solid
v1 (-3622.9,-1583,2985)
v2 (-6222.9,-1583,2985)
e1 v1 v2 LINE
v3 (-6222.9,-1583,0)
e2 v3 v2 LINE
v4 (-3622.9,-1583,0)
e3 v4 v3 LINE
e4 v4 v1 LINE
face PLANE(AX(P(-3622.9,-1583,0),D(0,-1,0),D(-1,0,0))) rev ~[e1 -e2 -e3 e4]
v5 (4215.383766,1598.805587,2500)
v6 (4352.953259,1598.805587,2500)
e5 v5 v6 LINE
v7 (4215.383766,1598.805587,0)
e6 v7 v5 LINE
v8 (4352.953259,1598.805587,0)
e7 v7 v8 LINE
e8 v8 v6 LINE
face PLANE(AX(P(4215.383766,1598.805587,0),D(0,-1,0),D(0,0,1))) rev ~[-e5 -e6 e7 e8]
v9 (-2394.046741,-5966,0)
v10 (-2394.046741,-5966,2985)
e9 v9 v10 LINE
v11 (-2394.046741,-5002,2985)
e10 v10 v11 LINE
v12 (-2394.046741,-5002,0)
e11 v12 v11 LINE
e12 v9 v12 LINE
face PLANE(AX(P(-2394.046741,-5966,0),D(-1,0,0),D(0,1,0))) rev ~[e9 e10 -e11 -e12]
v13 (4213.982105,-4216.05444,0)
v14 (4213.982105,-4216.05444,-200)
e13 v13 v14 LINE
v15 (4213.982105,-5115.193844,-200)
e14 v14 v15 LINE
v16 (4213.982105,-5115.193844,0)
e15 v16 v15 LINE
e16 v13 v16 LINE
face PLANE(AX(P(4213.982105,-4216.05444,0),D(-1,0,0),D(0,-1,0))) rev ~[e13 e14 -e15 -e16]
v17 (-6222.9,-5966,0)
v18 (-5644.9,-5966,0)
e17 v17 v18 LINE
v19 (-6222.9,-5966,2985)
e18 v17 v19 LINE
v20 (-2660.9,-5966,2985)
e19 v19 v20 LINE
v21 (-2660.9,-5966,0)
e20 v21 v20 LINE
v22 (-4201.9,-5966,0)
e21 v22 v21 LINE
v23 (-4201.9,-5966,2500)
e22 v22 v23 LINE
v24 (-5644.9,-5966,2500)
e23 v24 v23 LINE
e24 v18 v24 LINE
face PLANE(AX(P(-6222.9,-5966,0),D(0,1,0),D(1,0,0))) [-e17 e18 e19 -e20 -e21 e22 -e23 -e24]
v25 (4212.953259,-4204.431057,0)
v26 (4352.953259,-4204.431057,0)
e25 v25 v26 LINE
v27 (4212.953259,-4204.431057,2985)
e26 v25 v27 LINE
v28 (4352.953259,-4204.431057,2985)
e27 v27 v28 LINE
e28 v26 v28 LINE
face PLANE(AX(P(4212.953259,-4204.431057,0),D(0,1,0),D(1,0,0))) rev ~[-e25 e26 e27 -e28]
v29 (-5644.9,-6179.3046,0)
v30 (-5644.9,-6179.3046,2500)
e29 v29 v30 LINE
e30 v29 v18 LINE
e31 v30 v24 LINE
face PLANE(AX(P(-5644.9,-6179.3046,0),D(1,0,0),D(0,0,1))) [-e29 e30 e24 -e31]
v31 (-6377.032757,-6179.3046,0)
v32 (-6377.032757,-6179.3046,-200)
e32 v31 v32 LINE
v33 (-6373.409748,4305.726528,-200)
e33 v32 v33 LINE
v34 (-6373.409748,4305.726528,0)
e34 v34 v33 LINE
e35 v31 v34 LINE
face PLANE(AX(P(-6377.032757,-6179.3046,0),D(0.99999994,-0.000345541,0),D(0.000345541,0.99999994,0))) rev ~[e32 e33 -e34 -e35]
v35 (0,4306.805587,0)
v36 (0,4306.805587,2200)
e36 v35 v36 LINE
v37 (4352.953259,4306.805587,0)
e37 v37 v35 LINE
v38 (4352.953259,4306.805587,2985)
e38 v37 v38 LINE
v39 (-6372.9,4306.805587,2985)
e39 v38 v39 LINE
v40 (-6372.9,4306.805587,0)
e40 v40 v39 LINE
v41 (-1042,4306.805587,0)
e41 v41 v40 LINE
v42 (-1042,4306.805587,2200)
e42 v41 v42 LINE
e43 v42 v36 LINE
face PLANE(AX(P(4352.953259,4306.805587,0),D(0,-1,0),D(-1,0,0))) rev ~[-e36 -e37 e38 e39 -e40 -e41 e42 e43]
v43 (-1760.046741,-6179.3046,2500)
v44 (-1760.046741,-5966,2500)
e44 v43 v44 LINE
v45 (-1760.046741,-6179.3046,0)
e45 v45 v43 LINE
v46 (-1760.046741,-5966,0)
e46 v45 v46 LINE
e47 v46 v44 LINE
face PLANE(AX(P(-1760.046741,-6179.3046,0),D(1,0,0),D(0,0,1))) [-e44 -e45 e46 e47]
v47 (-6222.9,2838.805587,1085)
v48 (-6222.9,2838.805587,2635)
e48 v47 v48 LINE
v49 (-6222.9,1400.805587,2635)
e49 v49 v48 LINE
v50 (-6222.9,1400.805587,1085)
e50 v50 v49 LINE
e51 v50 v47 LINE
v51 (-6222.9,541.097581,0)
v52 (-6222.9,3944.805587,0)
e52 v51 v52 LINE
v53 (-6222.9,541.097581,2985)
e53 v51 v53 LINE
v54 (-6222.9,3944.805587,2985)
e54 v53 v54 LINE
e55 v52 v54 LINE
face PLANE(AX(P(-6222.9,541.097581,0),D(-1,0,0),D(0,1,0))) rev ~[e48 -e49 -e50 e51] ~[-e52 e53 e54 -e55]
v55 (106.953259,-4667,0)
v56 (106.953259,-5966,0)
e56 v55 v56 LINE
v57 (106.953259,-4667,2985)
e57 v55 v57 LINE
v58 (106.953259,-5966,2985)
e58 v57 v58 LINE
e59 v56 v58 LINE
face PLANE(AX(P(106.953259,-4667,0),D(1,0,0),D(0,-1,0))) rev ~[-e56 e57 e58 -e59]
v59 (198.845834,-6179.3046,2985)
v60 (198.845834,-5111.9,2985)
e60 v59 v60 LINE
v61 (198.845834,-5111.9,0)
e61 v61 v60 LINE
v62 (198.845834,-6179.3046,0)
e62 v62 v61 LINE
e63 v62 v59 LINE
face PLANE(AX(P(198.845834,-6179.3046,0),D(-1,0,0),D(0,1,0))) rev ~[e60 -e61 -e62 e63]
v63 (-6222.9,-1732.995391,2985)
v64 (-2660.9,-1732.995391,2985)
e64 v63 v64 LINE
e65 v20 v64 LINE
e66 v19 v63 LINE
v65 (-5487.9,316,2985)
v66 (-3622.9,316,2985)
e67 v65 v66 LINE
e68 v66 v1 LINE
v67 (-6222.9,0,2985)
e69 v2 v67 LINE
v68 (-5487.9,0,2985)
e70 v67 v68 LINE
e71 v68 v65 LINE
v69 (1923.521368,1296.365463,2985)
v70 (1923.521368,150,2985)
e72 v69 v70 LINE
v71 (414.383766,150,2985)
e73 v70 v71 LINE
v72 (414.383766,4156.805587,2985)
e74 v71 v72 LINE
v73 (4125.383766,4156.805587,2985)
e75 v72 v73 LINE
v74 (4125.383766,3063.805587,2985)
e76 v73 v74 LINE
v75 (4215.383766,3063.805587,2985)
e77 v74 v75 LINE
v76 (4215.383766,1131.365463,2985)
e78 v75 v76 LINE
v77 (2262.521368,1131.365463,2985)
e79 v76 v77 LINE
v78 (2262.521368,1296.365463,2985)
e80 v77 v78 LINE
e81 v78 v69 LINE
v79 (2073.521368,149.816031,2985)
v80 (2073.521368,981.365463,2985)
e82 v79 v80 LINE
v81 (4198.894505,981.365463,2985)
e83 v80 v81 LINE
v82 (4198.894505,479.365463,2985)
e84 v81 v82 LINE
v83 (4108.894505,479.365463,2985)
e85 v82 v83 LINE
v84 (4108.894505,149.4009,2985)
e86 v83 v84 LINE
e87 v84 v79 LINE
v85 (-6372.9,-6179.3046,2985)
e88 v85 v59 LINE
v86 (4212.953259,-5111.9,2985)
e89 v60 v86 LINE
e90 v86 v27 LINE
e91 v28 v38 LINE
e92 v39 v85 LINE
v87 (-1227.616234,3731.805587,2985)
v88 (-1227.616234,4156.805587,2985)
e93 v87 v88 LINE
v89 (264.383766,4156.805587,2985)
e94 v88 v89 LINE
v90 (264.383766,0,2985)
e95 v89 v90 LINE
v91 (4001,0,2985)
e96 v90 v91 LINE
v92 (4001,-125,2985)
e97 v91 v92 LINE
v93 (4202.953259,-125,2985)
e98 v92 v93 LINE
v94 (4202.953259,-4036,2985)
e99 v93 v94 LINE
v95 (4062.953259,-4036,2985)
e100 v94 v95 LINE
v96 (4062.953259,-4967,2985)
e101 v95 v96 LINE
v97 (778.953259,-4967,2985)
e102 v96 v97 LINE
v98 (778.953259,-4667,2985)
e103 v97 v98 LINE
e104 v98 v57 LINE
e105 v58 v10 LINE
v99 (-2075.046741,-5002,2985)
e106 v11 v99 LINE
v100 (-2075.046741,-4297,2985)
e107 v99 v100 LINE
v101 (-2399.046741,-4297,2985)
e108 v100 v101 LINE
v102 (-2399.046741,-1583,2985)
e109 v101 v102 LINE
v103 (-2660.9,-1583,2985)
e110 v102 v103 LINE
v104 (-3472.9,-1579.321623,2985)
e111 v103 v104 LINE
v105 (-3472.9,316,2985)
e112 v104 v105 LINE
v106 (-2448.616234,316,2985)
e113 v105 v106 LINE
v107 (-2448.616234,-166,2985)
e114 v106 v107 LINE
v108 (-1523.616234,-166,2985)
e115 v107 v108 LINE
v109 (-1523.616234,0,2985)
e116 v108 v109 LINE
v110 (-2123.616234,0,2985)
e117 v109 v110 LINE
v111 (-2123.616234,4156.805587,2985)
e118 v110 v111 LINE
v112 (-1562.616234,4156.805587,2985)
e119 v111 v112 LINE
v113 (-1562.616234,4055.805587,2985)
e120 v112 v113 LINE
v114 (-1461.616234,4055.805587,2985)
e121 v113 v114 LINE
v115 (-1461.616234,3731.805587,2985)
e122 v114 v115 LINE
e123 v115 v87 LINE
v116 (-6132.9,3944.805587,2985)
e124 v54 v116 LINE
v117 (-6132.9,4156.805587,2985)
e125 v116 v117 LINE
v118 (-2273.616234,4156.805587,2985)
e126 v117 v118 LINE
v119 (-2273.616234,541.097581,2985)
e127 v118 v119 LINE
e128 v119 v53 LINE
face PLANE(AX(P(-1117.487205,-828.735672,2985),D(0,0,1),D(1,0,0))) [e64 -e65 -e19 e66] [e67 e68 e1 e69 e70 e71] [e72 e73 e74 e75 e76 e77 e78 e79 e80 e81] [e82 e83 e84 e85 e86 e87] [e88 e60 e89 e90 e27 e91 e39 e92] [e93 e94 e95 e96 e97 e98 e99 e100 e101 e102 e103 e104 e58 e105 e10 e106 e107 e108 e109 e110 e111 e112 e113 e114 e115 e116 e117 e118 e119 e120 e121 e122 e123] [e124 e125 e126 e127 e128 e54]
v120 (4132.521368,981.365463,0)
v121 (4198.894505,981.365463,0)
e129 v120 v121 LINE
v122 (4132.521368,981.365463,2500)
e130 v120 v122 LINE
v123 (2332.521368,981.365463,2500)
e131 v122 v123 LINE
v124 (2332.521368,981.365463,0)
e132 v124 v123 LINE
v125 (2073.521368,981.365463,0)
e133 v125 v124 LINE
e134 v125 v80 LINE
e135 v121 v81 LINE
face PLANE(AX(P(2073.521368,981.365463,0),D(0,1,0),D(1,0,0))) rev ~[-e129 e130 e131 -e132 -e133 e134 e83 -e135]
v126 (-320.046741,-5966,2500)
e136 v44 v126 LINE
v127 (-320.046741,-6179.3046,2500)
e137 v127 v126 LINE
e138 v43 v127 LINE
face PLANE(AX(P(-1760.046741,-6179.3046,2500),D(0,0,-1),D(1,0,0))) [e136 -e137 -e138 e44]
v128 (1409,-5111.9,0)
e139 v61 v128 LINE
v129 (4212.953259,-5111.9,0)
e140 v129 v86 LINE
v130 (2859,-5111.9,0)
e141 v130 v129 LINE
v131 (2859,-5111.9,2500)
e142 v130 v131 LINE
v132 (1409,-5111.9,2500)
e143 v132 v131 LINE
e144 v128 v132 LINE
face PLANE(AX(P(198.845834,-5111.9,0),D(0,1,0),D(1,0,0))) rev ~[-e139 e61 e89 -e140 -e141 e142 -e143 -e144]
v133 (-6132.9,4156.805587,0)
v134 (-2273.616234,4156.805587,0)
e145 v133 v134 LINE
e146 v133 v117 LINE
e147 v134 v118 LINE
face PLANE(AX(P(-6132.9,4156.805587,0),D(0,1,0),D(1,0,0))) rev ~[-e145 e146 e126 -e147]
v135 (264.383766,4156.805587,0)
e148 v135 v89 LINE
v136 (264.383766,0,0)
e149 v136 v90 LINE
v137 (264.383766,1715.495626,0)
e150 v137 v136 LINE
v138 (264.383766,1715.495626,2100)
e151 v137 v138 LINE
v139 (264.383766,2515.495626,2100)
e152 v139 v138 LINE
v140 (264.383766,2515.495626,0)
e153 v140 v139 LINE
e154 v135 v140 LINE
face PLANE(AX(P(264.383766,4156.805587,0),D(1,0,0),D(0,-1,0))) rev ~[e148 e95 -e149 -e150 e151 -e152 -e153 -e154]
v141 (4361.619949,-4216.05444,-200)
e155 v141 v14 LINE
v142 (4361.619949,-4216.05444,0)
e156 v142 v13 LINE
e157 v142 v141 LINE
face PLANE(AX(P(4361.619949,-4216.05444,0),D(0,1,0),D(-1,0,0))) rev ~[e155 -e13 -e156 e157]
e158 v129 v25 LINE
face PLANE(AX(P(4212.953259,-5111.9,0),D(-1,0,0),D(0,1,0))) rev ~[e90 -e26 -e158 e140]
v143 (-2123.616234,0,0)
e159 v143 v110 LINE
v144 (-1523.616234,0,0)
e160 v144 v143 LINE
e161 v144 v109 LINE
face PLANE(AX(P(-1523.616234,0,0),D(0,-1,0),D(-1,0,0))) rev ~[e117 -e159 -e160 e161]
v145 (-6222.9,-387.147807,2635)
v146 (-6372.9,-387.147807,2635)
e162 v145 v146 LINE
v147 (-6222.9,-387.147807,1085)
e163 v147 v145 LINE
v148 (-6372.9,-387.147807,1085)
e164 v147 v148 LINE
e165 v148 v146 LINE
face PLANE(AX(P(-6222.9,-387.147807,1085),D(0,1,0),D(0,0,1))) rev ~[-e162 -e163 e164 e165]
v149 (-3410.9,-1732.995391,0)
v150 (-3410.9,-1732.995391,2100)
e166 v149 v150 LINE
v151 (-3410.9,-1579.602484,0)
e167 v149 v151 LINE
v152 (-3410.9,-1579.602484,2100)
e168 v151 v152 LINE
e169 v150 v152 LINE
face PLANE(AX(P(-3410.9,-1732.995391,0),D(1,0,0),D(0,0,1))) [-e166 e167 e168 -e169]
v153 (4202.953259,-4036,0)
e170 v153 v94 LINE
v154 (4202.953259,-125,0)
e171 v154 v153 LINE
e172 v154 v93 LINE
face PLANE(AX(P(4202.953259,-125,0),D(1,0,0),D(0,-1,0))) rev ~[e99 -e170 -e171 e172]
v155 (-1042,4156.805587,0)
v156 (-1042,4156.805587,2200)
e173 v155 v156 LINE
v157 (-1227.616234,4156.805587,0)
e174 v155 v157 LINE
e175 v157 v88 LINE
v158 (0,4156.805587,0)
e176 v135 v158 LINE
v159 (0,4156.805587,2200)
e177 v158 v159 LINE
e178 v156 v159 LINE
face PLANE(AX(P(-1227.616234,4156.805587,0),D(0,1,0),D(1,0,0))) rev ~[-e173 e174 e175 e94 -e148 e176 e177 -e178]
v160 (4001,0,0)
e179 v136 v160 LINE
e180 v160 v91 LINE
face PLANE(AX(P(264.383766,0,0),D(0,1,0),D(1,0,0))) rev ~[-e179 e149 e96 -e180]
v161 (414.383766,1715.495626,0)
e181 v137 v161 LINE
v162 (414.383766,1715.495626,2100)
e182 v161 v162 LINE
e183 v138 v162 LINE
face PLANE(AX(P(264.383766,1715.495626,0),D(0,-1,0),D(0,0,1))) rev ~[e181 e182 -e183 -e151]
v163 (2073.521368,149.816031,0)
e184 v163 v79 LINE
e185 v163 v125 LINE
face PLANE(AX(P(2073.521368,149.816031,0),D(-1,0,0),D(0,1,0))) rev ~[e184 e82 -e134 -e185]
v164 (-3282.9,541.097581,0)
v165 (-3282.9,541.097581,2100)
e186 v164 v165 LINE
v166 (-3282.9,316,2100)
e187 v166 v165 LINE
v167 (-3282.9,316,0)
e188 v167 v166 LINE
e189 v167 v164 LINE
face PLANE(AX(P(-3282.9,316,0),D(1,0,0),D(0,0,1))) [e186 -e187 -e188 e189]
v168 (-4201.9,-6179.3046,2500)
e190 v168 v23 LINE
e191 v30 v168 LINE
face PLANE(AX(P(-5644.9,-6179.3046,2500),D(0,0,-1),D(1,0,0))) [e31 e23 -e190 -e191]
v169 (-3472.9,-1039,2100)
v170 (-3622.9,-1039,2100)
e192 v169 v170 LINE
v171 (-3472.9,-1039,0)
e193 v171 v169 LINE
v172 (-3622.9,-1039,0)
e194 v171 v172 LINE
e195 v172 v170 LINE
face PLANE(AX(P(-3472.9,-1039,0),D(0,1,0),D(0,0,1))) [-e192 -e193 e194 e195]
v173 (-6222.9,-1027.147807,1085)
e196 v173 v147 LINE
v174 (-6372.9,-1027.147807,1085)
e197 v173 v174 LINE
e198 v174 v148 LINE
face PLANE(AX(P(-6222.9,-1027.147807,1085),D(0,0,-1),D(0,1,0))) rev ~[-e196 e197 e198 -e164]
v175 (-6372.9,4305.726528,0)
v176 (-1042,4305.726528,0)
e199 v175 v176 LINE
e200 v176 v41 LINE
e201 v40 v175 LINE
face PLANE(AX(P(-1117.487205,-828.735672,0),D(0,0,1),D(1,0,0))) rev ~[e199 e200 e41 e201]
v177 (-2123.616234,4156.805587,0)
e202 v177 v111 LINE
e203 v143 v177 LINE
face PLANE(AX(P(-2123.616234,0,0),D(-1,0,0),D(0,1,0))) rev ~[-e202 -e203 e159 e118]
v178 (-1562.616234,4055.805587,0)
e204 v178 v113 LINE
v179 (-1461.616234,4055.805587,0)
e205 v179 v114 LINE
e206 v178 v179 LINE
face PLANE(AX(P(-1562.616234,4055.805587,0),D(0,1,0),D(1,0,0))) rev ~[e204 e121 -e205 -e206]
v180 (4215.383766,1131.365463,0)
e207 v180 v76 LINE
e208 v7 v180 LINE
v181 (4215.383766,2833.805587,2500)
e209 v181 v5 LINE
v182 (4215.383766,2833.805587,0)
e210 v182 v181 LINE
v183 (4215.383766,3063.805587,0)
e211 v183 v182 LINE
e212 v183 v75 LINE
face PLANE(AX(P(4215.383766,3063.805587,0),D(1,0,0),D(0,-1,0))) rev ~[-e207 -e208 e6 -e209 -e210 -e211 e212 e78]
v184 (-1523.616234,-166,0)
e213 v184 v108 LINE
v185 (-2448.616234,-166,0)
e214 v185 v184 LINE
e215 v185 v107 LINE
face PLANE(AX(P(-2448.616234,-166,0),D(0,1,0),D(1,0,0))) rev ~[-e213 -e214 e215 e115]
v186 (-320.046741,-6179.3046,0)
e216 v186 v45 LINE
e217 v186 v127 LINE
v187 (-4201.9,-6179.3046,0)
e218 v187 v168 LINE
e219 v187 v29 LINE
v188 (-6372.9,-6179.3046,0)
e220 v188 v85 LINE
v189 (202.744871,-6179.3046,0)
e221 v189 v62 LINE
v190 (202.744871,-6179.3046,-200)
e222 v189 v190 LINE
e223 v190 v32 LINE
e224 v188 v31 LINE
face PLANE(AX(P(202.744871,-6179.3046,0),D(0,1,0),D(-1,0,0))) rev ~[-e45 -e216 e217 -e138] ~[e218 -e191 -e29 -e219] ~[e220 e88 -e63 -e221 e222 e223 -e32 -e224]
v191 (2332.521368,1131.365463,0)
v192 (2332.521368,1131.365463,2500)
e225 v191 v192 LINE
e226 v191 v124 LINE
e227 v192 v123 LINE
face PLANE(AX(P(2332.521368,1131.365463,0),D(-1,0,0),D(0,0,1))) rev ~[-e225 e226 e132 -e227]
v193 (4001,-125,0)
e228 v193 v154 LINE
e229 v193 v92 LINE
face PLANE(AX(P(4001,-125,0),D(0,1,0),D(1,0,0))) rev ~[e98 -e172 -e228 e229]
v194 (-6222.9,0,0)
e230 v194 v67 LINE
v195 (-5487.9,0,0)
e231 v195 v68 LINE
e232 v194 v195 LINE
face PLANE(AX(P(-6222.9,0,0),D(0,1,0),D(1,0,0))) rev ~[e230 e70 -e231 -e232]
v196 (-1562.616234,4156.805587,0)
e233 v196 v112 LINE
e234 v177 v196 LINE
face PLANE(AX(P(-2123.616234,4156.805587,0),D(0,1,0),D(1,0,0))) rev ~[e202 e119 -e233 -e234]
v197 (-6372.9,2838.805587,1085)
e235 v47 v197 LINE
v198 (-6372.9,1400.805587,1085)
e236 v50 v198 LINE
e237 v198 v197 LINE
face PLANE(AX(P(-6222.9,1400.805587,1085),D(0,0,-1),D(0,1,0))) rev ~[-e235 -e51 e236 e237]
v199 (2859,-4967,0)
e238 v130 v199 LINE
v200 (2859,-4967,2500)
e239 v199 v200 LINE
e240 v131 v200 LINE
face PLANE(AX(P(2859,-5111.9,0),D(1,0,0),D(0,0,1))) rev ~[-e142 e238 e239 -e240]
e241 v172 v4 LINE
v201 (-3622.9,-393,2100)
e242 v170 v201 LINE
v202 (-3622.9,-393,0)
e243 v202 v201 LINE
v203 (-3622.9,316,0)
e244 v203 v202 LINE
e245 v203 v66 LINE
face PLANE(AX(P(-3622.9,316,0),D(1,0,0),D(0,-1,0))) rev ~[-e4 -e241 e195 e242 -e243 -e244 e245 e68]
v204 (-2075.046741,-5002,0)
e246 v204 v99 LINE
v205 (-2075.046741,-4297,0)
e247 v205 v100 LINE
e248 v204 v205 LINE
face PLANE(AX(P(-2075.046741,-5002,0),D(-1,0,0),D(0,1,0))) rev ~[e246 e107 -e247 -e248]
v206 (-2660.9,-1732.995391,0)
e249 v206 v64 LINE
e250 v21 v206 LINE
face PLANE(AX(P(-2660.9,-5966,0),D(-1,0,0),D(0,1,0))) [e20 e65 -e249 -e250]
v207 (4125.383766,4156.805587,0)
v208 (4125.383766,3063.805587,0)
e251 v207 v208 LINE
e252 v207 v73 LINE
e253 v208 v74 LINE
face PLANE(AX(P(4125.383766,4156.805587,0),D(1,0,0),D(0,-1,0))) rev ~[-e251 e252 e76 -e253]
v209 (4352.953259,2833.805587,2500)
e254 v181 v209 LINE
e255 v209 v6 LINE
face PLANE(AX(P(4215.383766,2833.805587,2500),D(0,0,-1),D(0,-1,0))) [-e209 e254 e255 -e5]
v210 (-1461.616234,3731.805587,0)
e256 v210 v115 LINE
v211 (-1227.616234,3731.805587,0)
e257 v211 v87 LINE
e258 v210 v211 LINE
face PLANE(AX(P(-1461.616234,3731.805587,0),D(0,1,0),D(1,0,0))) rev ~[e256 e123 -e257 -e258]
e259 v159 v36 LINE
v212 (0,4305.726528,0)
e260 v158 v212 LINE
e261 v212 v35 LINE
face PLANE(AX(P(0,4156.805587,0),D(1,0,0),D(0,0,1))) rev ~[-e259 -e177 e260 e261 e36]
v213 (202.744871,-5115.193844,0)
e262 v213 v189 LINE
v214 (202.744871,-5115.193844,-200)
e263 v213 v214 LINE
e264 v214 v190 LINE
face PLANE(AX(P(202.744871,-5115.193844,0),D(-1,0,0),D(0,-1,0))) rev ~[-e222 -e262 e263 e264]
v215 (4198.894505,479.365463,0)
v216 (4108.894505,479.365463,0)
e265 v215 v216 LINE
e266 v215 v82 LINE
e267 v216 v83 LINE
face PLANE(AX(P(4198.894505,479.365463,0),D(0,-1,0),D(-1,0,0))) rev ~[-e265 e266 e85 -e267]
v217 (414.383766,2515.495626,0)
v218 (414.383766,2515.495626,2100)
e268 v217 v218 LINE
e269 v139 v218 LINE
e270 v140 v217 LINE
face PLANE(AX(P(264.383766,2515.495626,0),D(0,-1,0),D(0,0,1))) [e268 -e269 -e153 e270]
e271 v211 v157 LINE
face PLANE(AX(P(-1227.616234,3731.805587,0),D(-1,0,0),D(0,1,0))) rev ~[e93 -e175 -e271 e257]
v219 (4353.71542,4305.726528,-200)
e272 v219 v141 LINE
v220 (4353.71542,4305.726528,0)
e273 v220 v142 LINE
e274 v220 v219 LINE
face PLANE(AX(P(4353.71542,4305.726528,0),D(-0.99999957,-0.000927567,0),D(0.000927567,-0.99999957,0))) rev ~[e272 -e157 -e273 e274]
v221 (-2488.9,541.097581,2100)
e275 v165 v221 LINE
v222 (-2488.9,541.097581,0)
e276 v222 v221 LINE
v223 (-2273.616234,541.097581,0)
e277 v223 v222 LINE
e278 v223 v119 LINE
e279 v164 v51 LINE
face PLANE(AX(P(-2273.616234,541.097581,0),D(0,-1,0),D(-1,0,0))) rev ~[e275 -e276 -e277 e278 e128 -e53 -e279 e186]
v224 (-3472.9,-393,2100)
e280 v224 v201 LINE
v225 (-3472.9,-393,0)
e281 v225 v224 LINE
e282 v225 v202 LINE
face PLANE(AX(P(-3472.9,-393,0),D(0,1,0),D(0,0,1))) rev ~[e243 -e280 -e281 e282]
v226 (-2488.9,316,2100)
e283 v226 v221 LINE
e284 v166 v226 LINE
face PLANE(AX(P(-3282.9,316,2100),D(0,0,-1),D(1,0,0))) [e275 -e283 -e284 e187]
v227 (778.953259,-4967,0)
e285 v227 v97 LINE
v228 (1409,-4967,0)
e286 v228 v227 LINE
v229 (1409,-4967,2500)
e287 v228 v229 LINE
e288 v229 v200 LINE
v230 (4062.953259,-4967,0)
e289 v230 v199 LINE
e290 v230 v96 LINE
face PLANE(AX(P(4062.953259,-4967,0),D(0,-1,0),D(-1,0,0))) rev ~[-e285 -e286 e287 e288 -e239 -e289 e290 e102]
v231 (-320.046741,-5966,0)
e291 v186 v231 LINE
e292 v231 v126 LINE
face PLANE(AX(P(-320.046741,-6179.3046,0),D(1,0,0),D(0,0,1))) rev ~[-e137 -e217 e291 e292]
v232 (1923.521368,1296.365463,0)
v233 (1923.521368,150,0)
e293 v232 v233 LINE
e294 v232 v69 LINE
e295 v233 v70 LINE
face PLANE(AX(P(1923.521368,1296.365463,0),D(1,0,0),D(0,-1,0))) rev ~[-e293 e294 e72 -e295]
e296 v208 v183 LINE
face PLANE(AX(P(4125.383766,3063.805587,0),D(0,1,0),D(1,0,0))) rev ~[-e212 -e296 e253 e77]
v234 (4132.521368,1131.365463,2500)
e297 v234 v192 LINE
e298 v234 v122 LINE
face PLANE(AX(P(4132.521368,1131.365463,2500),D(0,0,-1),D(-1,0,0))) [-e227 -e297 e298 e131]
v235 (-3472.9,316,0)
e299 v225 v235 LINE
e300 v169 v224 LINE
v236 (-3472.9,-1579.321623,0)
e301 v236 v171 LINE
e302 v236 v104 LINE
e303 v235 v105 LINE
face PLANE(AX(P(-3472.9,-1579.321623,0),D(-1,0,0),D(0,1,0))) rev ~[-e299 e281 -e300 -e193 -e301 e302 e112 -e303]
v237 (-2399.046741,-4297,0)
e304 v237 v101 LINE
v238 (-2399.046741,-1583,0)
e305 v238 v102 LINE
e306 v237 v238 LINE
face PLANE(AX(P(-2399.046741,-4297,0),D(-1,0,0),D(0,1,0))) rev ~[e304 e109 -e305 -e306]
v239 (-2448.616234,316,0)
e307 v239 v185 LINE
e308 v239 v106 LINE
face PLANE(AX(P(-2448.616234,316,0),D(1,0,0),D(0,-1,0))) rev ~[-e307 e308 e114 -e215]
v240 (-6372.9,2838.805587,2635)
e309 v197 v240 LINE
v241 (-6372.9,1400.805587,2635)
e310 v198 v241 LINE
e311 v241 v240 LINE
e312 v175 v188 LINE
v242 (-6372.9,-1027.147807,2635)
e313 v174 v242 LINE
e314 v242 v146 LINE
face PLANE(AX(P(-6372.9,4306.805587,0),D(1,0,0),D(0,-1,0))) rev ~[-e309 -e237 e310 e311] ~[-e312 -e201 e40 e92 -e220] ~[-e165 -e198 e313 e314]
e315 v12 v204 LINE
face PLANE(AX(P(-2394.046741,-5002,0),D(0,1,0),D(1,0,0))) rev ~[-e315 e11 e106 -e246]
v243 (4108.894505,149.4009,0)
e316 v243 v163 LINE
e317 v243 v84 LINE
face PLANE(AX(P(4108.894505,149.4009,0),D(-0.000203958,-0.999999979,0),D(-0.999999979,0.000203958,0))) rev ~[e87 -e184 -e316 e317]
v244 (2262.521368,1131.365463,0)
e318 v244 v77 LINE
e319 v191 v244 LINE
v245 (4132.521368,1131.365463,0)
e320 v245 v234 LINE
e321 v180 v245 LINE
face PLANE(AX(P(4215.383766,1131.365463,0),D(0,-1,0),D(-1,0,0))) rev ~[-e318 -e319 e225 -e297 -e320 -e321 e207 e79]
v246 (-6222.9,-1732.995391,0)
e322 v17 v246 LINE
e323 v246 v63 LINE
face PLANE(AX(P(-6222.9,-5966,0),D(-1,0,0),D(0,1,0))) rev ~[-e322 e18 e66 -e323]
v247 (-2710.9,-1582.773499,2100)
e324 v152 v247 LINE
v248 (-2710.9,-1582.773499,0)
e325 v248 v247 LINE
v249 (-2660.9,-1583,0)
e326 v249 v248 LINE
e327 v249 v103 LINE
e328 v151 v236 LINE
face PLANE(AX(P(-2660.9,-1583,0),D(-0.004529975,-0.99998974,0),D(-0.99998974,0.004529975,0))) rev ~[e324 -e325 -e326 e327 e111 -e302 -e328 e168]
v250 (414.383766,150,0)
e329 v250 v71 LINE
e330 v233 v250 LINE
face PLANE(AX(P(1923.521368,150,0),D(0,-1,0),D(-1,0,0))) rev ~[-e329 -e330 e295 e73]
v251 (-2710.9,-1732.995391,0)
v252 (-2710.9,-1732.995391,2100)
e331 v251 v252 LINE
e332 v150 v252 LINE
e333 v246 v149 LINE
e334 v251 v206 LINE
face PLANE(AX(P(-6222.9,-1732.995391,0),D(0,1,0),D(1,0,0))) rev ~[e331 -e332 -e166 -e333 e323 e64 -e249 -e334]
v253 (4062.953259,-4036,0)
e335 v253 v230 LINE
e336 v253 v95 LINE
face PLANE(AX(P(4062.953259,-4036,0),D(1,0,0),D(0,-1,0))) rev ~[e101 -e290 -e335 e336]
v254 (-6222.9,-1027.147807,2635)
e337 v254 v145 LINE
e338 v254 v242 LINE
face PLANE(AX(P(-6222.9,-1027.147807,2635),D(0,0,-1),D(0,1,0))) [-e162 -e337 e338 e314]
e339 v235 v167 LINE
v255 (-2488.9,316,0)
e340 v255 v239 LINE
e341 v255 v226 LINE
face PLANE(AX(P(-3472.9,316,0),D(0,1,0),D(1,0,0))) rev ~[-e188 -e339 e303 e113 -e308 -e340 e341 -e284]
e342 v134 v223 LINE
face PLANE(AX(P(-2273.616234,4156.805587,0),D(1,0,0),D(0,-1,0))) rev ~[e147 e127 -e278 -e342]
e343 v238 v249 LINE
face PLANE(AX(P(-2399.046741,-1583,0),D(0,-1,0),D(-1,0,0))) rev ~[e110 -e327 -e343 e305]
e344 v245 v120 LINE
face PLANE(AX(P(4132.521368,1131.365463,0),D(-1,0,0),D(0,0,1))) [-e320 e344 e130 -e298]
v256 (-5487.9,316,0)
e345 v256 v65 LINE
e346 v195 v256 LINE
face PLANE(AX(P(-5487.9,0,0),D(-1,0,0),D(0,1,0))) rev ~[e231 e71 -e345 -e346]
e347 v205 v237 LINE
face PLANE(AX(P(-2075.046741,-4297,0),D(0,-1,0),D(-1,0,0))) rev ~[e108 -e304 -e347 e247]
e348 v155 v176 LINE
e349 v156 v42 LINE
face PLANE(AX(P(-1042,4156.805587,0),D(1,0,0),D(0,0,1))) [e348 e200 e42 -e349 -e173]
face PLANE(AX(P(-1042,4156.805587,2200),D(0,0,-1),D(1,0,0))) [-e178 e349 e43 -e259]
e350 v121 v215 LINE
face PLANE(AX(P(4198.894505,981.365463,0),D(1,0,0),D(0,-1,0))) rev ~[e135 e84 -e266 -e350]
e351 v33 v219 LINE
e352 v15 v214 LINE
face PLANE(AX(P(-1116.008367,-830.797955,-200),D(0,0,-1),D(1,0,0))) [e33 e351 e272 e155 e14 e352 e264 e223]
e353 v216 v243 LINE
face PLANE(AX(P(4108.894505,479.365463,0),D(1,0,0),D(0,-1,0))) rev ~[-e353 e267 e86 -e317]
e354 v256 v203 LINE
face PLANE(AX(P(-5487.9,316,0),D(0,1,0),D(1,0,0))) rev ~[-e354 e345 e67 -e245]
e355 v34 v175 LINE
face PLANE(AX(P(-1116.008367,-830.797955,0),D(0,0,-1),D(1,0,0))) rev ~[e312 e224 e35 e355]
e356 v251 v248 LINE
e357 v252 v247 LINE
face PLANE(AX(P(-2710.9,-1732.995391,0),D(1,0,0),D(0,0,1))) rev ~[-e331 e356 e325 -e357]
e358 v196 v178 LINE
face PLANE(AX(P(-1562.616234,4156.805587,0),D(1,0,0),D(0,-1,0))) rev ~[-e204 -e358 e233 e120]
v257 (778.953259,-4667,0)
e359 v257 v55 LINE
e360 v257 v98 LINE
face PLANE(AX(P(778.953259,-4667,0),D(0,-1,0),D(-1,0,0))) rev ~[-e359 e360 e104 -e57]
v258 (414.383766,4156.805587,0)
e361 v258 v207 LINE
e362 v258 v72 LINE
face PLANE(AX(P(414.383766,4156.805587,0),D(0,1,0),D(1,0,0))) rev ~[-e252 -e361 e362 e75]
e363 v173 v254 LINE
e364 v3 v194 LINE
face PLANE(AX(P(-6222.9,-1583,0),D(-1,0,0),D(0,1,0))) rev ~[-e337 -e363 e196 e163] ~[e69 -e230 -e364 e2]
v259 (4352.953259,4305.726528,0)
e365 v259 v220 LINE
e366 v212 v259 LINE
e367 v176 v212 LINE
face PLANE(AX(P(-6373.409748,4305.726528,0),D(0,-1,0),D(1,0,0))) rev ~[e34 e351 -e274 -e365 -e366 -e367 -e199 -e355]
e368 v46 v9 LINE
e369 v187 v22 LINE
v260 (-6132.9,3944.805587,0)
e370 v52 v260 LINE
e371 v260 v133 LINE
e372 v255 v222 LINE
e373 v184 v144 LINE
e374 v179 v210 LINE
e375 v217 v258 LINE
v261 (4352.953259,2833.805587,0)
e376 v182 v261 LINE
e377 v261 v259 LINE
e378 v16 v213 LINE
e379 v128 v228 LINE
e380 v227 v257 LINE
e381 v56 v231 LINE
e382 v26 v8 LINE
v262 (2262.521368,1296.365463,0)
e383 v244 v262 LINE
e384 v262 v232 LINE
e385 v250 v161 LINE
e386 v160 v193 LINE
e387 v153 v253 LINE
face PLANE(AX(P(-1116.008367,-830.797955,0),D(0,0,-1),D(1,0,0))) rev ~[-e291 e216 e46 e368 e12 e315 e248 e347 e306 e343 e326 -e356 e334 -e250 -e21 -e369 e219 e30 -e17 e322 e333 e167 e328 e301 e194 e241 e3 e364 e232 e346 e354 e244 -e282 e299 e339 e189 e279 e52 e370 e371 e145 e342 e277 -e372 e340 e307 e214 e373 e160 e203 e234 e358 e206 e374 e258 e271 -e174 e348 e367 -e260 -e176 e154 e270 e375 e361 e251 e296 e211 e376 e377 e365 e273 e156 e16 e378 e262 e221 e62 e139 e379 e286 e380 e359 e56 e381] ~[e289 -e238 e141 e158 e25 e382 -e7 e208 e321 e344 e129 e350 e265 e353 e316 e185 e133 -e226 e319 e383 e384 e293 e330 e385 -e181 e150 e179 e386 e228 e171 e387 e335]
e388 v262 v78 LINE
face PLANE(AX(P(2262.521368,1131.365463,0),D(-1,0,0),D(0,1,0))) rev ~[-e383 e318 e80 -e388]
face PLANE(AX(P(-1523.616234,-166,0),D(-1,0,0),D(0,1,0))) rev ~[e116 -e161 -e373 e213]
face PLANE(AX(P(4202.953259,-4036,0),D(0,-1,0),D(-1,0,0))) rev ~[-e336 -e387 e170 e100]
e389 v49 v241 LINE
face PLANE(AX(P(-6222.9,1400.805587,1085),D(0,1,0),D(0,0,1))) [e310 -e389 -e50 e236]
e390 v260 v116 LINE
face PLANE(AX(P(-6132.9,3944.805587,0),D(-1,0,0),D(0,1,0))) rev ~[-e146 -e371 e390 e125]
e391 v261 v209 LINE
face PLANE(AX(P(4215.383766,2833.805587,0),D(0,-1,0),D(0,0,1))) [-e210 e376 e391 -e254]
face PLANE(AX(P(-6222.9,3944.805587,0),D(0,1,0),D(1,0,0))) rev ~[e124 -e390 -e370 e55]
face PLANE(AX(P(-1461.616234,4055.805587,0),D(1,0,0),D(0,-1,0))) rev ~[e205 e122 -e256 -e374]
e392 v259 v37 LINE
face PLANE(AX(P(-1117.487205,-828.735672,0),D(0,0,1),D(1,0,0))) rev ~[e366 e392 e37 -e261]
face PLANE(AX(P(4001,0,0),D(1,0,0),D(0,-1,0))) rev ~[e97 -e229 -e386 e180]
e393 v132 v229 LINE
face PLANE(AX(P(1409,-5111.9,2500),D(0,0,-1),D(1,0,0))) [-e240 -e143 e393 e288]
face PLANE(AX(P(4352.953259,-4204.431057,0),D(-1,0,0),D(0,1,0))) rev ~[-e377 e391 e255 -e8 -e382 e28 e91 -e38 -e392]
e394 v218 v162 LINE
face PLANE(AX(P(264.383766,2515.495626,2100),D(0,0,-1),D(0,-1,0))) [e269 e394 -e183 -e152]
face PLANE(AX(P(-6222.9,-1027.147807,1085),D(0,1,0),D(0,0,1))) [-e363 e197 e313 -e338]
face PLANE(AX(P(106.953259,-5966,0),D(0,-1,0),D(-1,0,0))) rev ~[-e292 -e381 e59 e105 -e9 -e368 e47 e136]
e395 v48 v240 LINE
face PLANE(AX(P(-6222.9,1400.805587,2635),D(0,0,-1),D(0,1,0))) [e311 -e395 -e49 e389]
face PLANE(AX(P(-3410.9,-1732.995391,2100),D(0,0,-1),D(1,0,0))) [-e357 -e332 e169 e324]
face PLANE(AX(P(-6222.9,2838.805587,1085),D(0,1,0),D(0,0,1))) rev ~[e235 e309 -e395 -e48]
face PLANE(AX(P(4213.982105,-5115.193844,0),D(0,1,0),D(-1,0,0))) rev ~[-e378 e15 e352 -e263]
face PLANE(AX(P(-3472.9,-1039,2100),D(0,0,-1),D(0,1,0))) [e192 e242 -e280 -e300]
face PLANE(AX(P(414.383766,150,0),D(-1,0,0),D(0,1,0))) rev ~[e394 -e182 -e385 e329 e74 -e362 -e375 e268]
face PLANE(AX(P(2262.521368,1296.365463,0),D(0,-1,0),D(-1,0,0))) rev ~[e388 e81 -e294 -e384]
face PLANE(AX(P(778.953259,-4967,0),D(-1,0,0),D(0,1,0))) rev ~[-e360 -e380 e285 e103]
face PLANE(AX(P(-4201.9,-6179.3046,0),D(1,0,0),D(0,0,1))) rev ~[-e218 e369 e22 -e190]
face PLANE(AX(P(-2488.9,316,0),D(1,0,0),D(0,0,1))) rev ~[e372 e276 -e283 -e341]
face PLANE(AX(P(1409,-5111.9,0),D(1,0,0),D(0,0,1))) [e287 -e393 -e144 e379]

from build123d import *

# Parameters (mm, degrees)
F0_W      = 3562
F0_H      = 4233.004609108
F1_DEPTH  = 2985
F2_W      = 1450
F2_H      = 2500
F3_DEPTH  = 144.9
F4_W      = 1440
F4_H      = 2500
F5_DEPTH  = 213.304599762
F6_W      = 1443
F6_H      = 2500
F7_DEPTH  = 213.304599762
F8_W      = 797
F8_H      = 2500
F9_DEPTH  = 4156.8055872194
F10_W     = 800
F10_H     = 2100
F11_DEPTH = 150
F12_W     = 1042
F12_H     = 2200
F13_DEPTH = 150
F14_W     = 1235
F14_H     = 2500
F15_DEPTH = 137.5694923401
F16_W     = 700
F16_H     = 2100
F17_DEPTH = 153.3939067339
F18_W     = 794
F18_H     = 2100
F19_DEPTH = 225.0975813866
F20_W     = 646
F20_H     = 2100
F21_DEPTH = 150
F22_W     = 640
F22_H     = 1550
F23_DEPTH = 150
F24_W     = 1438
F24_H     = 1550
F25_DEPTH = 150
F27_DEPTH = 200
F28_W     = 1800
F28_H     = 2500
F29_DEPTH = 150


with BuildPart() as f1:
    # F0 (on Top) → F1 (new body)
    with BuildSketch(Plane.XY):
        Polygon((1409, -5111.9), (2800.470790863, -5111.9), (4212.9532585144, -5111.9), (4212.9532585144, -4204.4310569763), (4352.9532585144, -4204.4310569763), (4352.9532585144, 4306.8055872194), (-2273.6162338257, 4306.8055872194), (-6372.8999999957, 4306.8055872194), (-6372.8999999957, 541.0975813866), (-6372.8999999957, -6179.304599762), (-2660.8999999957, -6179.304599762), (-1872.0002385101, -6179.304599762), (-435.1912385101, -6179.304599762), (198.84583354, -6179.304599762), (198.84583354, -5111.9), (720.84583354, -5111.9), (1350.470790863, -5111.9), align=None)
        with Locations((-4441.8999999957, -3849.497695446)):
            Rectangle(F0_W, F0_H, mode=Mode.SUBTRACT)
        Polygon((-5487.8999999957, 316), (-3622.8999999957, 316), (-3622.8999999957, -1583), (-6222.8999999957, -1583), (-6222.8999999957, 0), (-5487.8999999957, 0), align=None, mode=Mode.SUBTRACT)
        Polygon((-6132.8999999957, 4156.8055872194), (-2273.6162338257, 4156.8055872194), (-2273.6162338257, 541.0975813866), (-3622.8999999957, 541.0975813866), (-6222.8999999957, 541.0975813866), (-6222.8999999957, 3944.8055872194), (-6132.8999999957, 3944.8055872194), align=None, mode=Mode.SUBTRACT)
        Polygon((264.3837661743, 4156.8055872194), (264.3837661743, 0), (4001, 0), (4001, -125), (4202.9532585144, -125), (4202.9532585144, -4036), (4062.9532585144, -4036), (4062.9532585144, -4501.5), (4062.9532585144, -4967), (2970.9532585144, -4967), (1520.9532585144, -4967), (778.9532585144, -4967), (778.9532585144, -4667), (106.9532585144, -4667), (106.9532585144, -5966), (-320.0467414856, -5966), (-1760.0467414856, -5966), (-2394.0467414856, -5966), (-2394.0467414856, -5002), (-2075.0467414856, -5002), (-2075.0467414856, -4297), (-2399.0467414856, -4297), (-2399.0467414856, -1583), (-2660.8999999957, -1583), (-3472.8999999957, -1579.3216228485), (-3472.8999999957, 316), (-2448.6162338257, 316), (-2448.6162338257, -166), (-2123.6162338257, -166), (-1523.6162338257, -166), (-1523.6162338257, 0), (-2123.6162338257, 0), (-2123.6162338257, 150), (-2123.6162338257, 4156.8055872194), (-1562.6162338257, 4156.8055872194), (-1562.6162338257, 4055.8055872194), (-1461.6162338257, 4055.8055872194), (-1461.6162338257, 3731.8055872194), (-1227.6162338257, 3731.8055872194), (-1227.6162338257, 4156.8055872194), align=None, mode=Mode.SUBTRACT)
        Polygon((4198.8945047255, 981.3654631398), (4198.8945047255, 479.3654631398), (4108.8945047255, 479.3654631398), (4108.8945047255, 149.4008999277), (2259.8945047255, 149.7780185152), (2073.5213682051, 149.8160308321), (2073.5213682051, 981.3654631398), align=None, mode=Mode.SUBTRACT)
        Polygon((4215.3837661743, 1131.3654631398), (2262.5213682051, 1131.3654631398), (2262.5213682051, 1296.3654631398), (1923.5213682051, 1296.3654631398), (1923.5213682051, 150), (414.3837661743, 150), (414.3837661743, 1131.3654631398), (414.3837661743, 4156.8055872194), (4125.3837661743, 4156.8055872194), (4125.3837661743, 3063.8055872194), (4215.3837661743, 3063.8055872194), align=None, mode=Mode.SUBTRACT)
    extrude(amount=F1_DEPTH)

    # F2 (on face) → F3 (cut, through all)
    with BuildSketch(Plane.XZ.offset(5111.9)):
        with Locations((2134, 1250)):
            Rectangle(F2_W, F2_H)
    extrude(amount=-F3_DEPTH, mode=Mode.SUBTRACT)

    # F4 (on face) → F5 (cut, through all)
    with BuildSketch(Plane.XZ.offset(6179.304599762)):
        with Locations((-1040.0467414856, 1250)):
            Rectangle(F4_W, F4_H)
    extrude(amount=-F5_DEPTH, mode=Mode.SUBTRACT)

    # F6 (on face) → F7 (cut, through all)
    with BuildSketch(Plane.XZ.offset(6179.304599762)):
        with Locations((-4923.3999999957, 1250)):
            Rectangle(F6_W, F6_H)
    extrude(amount=-F7_DEPTH, mode=Mode.SUBTRACT)

    # F8 (on face) → F9 (cut, through all)
    with BuildSketch(Plane.XZ):
        with Locations((-398.5, 1250)):
            Rectangle(F8_W, F8_H)
    extrude(amount=-F9_DEPTH, mode=Mode.SUBTRACT)

    # F10 (on face) → F11 (cut, through all)
    with BuildSketch(Plane(origin=(264.3837661743, 0, 0), x_dir=(0, -1, 0), z_dir=(-1, 0, 0))):
        with Locations((-2115.4956257177, 1050)):
            Rectangle(F10_W, F10_H)
    extrude(amount=-F11_DEPTH, mode=Mode.SUBTRACT)

    # F12 (on face) → F13 (cut, through all)
    with BuildSketch(Plane.XZ.offset(-4156.8055872194)):
        with Locations((-521, 1100)):
            Rectangle(F12_W, F12_H)
    extrude(amount=-F13_DEPTH, mode=Mode.SUBTRACT)

    # F14 (on face) → F15 (cut, through all)
    with BuildSketch(Plane(origin=(4215.3837661743, 0, 0), x_dir=(0, -1, 0), z_dir=(-1, 0, 0))):
        with Locations((-2216.3055872194, 1250)):
            Rectangle(F14_W, F14_H)
    extrude(amount=-F15_DEPTH, mode=Mode.SUBTRACT)

    # F16 (on face) → F17 (cut, through all)
    with BuildSketch(Plane.XZ.offset(1732.995390892)):
        with Locations((-3060.8999999957, 1050)):
            Rectangle(F16_W, F16_H)
    extrude(amount=-F17_DEPTH, mode=Mode.SUBTRACT)

    # F18 (on face) → F19 (cut, through all)
    with BuildSketch(Plane.XZ.offset(-316)):
        with Locations((-2885.8999999957, 1050)):
            Rectangle(F18_W, F18_H)
    extrude(amount=-F19_DEPTH, mode=Mode.SUBTRACT)

    # F20 (on face) → F21 (cut, through all)
    with BuildSketch(Plane.YZ.offset(-3472.8999999957)):
        with Locations((-716, 1050)):
            Rectangle(F20_W, F20_H)
    extrude(amount=-F21_DEPTH, mode=Mode.SUBTRACT)

    # F22 (on face) → F23 (cut, through all)
    with BuildSketch(Plane.YZ.offset(-6222.8999999957)):
        with Locations((-707.1478068829, 1860)):
            Rectangle(F22_W, F22_H)
    extrude(amount=-F23_DEPTH, mode=Mode.SUBTRACT)

    # F24 (on face) → F25 (cut, through all)
    with BuildSketch(Plane.YZ.offset(-6222.8999999957)):
        with Locations((2119.8055872194, 1860)):
            Rectangle(F24_W, F24_H)
    extrude(amount=-F25_DEPTH, mode=Mode.SUBTRACT)

    # F26 (on face) → F27 (join)
    with BuildSketch(Plane(origin=(0, 0, 0), x_dir=(1, 0, 0), z_dir=(0, 0, -1))):
        Polygon((202.7448713779, 6179.304599762), (-6377.0327568054, 6179.304599762), (-6373.4097480774, -4305.7265281677), (4353.7154197693, -4305.7265281677), (4361.6199493408, 4216.0544395447), (4213.9821052551, 4216.0544395447), (4213.9821052551, 5115.1938438416), (202.7448713779, 5115.1938438416), align=None)
    extrude(amount=F27_DEPTH)

    # F28 (on face) → F29 (cut, through all)
    with BuildSketch(Plane(origin=(0, 1131.3654631398, 0), x_dir=(-1, 0, 0), z_dir=(0, 1, 0))):
        with Locations((-3232.5213682051, 1250)):
            Rectangle(F28_W, F28_H)
    extrude(amount=-F29_DEPTH, mode=Mode.SUBTRACT)


solid = f1.part
